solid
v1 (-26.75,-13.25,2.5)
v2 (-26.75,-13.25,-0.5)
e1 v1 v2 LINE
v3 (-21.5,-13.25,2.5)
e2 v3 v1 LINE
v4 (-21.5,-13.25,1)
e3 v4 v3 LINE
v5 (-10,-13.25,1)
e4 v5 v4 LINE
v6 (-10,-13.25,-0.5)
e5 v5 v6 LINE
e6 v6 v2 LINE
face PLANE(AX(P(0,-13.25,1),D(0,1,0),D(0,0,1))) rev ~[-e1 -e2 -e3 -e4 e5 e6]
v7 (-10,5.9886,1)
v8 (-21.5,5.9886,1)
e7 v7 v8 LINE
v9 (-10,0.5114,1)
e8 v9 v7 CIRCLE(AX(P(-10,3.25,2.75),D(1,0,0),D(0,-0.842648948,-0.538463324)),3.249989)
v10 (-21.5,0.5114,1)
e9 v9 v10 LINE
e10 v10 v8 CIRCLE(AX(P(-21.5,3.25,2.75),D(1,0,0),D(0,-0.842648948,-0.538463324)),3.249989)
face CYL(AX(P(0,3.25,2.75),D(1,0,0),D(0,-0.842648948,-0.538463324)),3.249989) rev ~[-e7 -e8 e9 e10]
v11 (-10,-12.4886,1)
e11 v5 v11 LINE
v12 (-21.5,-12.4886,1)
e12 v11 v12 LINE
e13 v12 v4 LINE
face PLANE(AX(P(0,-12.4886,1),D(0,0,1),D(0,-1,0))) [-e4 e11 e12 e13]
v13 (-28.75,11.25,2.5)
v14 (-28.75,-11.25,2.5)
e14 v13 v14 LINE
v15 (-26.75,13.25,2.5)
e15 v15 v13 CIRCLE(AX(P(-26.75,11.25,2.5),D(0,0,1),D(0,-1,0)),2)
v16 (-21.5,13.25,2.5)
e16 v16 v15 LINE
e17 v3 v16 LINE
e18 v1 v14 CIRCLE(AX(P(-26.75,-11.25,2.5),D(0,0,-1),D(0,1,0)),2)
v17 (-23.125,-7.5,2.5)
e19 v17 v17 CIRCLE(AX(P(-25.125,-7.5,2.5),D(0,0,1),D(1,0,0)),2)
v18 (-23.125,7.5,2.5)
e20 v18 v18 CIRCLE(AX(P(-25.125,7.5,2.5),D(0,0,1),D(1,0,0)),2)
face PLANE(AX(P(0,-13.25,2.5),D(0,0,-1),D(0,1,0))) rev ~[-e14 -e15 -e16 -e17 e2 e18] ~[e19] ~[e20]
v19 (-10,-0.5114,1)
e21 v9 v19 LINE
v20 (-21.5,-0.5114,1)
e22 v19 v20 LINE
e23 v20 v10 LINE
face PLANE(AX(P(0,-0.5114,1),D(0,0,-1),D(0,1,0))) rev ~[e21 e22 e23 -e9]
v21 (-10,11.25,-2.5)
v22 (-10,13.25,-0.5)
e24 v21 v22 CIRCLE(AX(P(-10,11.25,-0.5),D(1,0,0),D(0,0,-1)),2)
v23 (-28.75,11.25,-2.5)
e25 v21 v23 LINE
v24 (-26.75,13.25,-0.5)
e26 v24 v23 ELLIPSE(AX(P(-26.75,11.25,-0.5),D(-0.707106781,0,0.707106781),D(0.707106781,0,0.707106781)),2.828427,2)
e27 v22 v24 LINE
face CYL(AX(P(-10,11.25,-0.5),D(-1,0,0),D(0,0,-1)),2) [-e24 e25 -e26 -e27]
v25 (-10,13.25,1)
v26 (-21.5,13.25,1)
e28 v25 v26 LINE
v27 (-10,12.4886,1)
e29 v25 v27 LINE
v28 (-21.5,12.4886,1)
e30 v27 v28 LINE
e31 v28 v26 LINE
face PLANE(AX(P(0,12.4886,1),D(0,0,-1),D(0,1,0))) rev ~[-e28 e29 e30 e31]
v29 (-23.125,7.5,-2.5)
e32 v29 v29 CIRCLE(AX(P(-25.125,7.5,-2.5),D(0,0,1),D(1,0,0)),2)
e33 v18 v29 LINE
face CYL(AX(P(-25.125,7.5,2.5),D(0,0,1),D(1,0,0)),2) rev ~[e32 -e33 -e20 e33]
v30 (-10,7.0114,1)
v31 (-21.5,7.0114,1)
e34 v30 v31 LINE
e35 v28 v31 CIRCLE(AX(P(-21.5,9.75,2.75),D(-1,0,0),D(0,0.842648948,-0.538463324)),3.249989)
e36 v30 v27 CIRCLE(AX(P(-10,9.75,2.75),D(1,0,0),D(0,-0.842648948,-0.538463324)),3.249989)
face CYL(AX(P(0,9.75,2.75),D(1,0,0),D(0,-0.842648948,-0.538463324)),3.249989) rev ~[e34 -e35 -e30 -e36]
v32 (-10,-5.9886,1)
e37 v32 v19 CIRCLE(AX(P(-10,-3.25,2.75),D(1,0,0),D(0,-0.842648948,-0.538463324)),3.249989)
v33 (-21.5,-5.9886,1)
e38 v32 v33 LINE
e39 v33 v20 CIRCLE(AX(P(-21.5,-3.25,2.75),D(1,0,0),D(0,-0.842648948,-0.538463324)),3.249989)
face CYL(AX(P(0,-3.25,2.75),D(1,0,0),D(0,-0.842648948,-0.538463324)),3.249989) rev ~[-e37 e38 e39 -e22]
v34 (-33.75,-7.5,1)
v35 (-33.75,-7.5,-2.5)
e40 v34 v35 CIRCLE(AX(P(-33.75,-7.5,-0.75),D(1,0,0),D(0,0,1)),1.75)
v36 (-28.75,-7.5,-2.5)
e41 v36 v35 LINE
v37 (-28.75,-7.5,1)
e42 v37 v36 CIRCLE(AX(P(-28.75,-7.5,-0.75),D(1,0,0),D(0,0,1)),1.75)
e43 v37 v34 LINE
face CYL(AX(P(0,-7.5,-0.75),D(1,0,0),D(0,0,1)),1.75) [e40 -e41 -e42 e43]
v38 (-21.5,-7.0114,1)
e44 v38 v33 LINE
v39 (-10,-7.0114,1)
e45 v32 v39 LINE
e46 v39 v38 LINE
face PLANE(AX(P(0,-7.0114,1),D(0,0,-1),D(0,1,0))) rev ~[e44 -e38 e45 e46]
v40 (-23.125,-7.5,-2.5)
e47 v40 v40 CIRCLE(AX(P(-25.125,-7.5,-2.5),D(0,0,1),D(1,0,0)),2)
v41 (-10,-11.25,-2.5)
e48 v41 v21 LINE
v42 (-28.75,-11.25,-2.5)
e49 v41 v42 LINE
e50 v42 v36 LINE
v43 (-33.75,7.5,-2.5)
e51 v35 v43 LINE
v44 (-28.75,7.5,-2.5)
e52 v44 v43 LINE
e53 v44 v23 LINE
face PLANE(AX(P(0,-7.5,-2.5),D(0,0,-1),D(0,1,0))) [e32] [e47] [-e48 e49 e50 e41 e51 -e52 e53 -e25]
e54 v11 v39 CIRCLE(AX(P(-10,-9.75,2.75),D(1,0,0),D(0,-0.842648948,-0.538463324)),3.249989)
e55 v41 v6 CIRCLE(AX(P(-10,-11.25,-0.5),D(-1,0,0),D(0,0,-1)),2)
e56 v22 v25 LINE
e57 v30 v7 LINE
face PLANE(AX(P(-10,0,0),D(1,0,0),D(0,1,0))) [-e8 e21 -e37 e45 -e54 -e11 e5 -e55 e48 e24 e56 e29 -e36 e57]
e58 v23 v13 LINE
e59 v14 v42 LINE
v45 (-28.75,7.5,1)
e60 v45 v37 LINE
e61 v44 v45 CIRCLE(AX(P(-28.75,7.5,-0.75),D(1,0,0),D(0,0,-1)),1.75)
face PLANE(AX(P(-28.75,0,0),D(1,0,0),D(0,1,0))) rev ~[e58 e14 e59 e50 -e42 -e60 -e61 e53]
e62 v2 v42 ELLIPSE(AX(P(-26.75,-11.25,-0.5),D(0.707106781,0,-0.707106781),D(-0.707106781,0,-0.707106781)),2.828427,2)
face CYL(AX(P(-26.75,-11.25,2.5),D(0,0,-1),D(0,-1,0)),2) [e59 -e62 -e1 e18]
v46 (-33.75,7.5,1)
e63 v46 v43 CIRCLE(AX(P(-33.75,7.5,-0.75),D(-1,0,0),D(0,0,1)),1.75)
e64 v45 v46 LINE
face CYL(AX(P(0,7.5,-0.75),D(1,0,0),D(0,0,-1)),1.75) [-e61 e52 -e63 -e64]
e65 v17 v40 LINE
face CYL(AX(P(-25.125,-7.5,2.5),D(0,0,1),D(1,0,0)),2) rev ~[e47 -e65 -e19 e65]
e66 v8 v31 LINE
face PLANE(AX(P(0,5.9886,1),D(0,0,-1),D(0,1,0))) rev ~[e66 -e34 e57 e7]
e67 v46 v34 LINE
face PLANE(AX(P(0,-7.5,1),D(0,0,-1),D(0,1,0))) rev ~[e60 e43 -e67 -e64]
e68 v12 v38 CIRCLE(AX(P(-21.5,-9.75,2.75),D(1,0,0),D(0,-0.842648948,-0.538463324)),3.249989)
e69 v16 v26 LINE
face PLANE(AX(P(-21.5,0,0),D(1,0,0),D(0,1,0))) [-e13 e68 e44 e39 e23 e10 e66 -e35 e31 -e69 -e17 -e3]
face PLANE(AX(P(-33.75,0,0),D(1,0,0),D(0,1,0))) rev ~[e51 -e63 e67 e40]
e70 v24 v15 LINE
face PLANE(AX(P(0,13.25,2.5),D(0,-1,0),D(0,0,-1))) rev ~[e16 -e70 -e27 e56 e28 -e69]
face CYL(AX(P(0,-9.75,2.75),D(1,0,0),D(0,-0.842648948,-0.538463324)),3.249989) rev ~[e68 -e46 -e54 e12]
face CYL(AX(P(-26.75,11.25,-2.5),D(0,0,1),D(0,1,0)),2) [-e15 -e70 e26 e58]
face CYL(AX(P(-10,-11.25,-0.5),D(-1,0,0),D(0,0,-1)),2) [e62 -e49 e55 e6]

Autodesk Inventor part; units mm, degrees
ref_plane "YZ Plane" through (0, 0, 0) normal (1, 0, 0) x (0, 1, 0)
ref_plane "XZ Plane" through (0, 0, 0) normal (0, 1, 0) x (-1, 0, 0)
ref_plane "XY Plane" through (0, 0, 0) normal (0, 0, 1) x (1, 0, 0)
sketch "スケッチ1" plane through (0, 0, 0) normal (1, 0, 0) x (0, 1, 0)
  arc A0 (-7.5, 1.25) -> (-7.5, -2.75) centre (-7.5, -0.75) ccw construction
  line L0 (-7.5, 1.25) -> (7.5, 1.25) construction
  line L1 (0, 2.5) -> (0, -2.5) construction
  arc A1 (7.5, -2.75) -> (7.5, 1.25) centre (7.5, -0.75) ccw construction
  arc A2 (-7.5, 1) -> (-7.5, -2.5) centre (-7.5, -0.75) ccw
  line L2 (-7.5, 1) -> (7.5, 1)
  line L3 (-7.5, -2.5) -> (7.5, -2.5)
  arc A3 (7.5, -2.5) -> (7.5, 1) centre (7.5, -0.75) ccw
  line L4 (-7.5, -2.75) -> (7.5, -2.75) construction
  line L5 (-13.5, 2.5) -> (13.5, 2.5) construction
  line L6 (13.5, 2.5) -> (13.5, -2.5) construction
  line L7 (13.5, -2.5) -> (-13.5, -2.5) construction
  line L8 (-13.5, -2.5) -> (-13.5, 2.5) construction
  line L9 (-13.5, 2.5) -> (13.5, -2.5) construction
  line L10 (13.5, 2.5) -> (-13.5, -2.5) construction
  line L11 (-13.25, 2.5) -> (13.25, 2.5)
  line L12 (13.25, 2.5) -> (13.25, -2.5)
  line L13 (13.25, -2.5) -> (-13.25, -2.5)
  line L14 (-13.25, -2.5) -> (-13.25, 2.5)
  line L15 (-13.25, 2.5) -> (13.25, -2.5) construction
  line L16 (13.25, 2.5) -> (-13.25, -2.5) construction
  circle A4 centre (-9.75, 2.75) radius 3.25 construction
  circle A5 centre (-3.25, 2.75) radius 3.25 construction
  circle A6 centre (3.25, 2.75) radius 3.25 construction
  circle A7 centre (9.75, 2.75) radius 3.25 construction
  arc A8 (-5.9886, 1) -> (-0.5114, 1) centre (-3.25, 2.75) ccw
  arc A9 (0.5114, 1) -> (5.9886, 1) centre (3.25, 2.75) ccw
  line L17 (-9.75, 2.75) -> (9.75, 2.75) construction
  line L18 (0, 2.5) -> (0, -2.75) construction
  line L19 (-7.0114, 1) -> (-5.9886, 1)
  line L20 (-0.5114, 1) -> (0.5114, 1)
  line L21 (5.9886, 1) -> (7.0114, 1)
  line L22 (-12.4886, 1) -> (-13.25, 1)
  line L23 (12.4886, 1) -> (13.25, 1)
  arc A10 (-12.9904, 2.5) -> (-12.9815, 2.404) centre (-9.75, 2.75) ccw
  arc A11 (-12.4886, 1) -> (-7.0114, 1) centre (-9.75, 2.75) ccw
  arc A12 (7.0114, 1) -> (12.4886, 1) centre (9.75, 2.75) ccw
  arc A13 (12.9815, 2.404) -> (12.9904, 2.5) centre (9.75, 2.75) ccw
  point P0 (0, 0)
  point P1 (0, 0)
  point P2 (0, 0)
  point P3 (-0.0096, 2.5)
  point P4 (0.0096, 2.5)
  point P5 (6.4904, 2.5)
  point P6 (0, 2.75)
  point P7 (-7.5, -2.5)
  point P8 (5.9886, 1)
  point P9 (0.5114, 1)
  point P10 (-0.5114, 1)
  point P11 (-5.9886, 1)
  point P12 (-6.9904, 2.5)
  point P13 (-7.0114, 1)
  point P14 (9.2254, -0.4574)
  point P15 (7.0114, 1)
  point P16 (-7.5, -2.5)
  point P17 (-9.2254, -0.4574)
  point P18 (-7.0114, 1)
  dimension "d0" = 2
  dimension "d1" = 15
  dimension "d2" = 0.25
  dimension "d3" = 6
  dimension "d4" = 6
  dimension "d5" = 0.25
  dimension "d6" = 5
  dimension "d7" = 6.5
  dimension "d8" = 6.5
  dimension "d10" = 6.5
  dimension "d12" = 6.5
  dimension "d27" = 1.5
  dimension "d28" = 2
  dimension "d29" = 0.7614
extrude "押し出し1" add sketch "スケッチ1" against normal blind 33.75 contours L2 A11 A2 | A11 L2 A8 A9 A12 A3 L3 A2 | L2 A8 | A12 L2 A3 | L2 A9
extrude "押し出し2" add sketch "スケッチ1" against normal blind 28.75
extrude "押し出し3" cut sketch "スケッチ1" against normal blind 21.5 contours L2 A11 A2 | A2 A11 L22 L14 L11 L12 L23 A12 A3 L2 | L2 A8 | A12 L2 A3 | L2 A9
extrude "押し出し4" cut sketch "スケッチ1" against normal blind 10
sketch "スケッチ2" plane through (-28.75, -13.25, 2.5) normal (0, 0, 1) x (1, 0, 0)
  line L0 (0, 0) -> (0, 26.5) projected
  line L1 (18.75, 26.5) -> (0, 26.5) projected
  line L2 (0, 0) -> (7.25, 0)
  line L3 (7.25, 0) -> (7.25, 26.5)
  line L4 (7.25, 26.5) -> (0, 26.5)
  line L5 (0, 26.5) -> (0, 0)
  line L6 (7.25, 0) -> (7.25, 26.5) projected
  line L7 (18.75, 0) -> (0, 0) projected
  line L8 (3.625, 0) -> (3.625, 26.5) construction
  line L9 (18.75, 26.5) -> (0, 26.5) projected
  circle A0 centre (3.625, 5.75) radius 2
  line L10 (0, 13.25) -> (7.25, 13.25) construction
  circle A1 centre (3.625, 20.75) radius 2
  point P0 (28.75, 13.25)
  point P1 (7.25, 0.2596)
  point P2 (7.25, 7.2404)
  point P3 (7.25, 26.2404)
  dimension "d23" = 4
  dimension "d24" = 15
extrude "押し出し5" cut sketch "スケッチ2" against normal through all contours A0 | A1
fillet "フィレット1" radius 2 4 edges at (-28.75, -13.25, 0) (-28.75, 13.25, 0) (-19.375, 13.25, -2.5) (-19.375, -13.25, -2.5)
equation "\"d5\" = d2"
properties part number "Weight_case_under"
